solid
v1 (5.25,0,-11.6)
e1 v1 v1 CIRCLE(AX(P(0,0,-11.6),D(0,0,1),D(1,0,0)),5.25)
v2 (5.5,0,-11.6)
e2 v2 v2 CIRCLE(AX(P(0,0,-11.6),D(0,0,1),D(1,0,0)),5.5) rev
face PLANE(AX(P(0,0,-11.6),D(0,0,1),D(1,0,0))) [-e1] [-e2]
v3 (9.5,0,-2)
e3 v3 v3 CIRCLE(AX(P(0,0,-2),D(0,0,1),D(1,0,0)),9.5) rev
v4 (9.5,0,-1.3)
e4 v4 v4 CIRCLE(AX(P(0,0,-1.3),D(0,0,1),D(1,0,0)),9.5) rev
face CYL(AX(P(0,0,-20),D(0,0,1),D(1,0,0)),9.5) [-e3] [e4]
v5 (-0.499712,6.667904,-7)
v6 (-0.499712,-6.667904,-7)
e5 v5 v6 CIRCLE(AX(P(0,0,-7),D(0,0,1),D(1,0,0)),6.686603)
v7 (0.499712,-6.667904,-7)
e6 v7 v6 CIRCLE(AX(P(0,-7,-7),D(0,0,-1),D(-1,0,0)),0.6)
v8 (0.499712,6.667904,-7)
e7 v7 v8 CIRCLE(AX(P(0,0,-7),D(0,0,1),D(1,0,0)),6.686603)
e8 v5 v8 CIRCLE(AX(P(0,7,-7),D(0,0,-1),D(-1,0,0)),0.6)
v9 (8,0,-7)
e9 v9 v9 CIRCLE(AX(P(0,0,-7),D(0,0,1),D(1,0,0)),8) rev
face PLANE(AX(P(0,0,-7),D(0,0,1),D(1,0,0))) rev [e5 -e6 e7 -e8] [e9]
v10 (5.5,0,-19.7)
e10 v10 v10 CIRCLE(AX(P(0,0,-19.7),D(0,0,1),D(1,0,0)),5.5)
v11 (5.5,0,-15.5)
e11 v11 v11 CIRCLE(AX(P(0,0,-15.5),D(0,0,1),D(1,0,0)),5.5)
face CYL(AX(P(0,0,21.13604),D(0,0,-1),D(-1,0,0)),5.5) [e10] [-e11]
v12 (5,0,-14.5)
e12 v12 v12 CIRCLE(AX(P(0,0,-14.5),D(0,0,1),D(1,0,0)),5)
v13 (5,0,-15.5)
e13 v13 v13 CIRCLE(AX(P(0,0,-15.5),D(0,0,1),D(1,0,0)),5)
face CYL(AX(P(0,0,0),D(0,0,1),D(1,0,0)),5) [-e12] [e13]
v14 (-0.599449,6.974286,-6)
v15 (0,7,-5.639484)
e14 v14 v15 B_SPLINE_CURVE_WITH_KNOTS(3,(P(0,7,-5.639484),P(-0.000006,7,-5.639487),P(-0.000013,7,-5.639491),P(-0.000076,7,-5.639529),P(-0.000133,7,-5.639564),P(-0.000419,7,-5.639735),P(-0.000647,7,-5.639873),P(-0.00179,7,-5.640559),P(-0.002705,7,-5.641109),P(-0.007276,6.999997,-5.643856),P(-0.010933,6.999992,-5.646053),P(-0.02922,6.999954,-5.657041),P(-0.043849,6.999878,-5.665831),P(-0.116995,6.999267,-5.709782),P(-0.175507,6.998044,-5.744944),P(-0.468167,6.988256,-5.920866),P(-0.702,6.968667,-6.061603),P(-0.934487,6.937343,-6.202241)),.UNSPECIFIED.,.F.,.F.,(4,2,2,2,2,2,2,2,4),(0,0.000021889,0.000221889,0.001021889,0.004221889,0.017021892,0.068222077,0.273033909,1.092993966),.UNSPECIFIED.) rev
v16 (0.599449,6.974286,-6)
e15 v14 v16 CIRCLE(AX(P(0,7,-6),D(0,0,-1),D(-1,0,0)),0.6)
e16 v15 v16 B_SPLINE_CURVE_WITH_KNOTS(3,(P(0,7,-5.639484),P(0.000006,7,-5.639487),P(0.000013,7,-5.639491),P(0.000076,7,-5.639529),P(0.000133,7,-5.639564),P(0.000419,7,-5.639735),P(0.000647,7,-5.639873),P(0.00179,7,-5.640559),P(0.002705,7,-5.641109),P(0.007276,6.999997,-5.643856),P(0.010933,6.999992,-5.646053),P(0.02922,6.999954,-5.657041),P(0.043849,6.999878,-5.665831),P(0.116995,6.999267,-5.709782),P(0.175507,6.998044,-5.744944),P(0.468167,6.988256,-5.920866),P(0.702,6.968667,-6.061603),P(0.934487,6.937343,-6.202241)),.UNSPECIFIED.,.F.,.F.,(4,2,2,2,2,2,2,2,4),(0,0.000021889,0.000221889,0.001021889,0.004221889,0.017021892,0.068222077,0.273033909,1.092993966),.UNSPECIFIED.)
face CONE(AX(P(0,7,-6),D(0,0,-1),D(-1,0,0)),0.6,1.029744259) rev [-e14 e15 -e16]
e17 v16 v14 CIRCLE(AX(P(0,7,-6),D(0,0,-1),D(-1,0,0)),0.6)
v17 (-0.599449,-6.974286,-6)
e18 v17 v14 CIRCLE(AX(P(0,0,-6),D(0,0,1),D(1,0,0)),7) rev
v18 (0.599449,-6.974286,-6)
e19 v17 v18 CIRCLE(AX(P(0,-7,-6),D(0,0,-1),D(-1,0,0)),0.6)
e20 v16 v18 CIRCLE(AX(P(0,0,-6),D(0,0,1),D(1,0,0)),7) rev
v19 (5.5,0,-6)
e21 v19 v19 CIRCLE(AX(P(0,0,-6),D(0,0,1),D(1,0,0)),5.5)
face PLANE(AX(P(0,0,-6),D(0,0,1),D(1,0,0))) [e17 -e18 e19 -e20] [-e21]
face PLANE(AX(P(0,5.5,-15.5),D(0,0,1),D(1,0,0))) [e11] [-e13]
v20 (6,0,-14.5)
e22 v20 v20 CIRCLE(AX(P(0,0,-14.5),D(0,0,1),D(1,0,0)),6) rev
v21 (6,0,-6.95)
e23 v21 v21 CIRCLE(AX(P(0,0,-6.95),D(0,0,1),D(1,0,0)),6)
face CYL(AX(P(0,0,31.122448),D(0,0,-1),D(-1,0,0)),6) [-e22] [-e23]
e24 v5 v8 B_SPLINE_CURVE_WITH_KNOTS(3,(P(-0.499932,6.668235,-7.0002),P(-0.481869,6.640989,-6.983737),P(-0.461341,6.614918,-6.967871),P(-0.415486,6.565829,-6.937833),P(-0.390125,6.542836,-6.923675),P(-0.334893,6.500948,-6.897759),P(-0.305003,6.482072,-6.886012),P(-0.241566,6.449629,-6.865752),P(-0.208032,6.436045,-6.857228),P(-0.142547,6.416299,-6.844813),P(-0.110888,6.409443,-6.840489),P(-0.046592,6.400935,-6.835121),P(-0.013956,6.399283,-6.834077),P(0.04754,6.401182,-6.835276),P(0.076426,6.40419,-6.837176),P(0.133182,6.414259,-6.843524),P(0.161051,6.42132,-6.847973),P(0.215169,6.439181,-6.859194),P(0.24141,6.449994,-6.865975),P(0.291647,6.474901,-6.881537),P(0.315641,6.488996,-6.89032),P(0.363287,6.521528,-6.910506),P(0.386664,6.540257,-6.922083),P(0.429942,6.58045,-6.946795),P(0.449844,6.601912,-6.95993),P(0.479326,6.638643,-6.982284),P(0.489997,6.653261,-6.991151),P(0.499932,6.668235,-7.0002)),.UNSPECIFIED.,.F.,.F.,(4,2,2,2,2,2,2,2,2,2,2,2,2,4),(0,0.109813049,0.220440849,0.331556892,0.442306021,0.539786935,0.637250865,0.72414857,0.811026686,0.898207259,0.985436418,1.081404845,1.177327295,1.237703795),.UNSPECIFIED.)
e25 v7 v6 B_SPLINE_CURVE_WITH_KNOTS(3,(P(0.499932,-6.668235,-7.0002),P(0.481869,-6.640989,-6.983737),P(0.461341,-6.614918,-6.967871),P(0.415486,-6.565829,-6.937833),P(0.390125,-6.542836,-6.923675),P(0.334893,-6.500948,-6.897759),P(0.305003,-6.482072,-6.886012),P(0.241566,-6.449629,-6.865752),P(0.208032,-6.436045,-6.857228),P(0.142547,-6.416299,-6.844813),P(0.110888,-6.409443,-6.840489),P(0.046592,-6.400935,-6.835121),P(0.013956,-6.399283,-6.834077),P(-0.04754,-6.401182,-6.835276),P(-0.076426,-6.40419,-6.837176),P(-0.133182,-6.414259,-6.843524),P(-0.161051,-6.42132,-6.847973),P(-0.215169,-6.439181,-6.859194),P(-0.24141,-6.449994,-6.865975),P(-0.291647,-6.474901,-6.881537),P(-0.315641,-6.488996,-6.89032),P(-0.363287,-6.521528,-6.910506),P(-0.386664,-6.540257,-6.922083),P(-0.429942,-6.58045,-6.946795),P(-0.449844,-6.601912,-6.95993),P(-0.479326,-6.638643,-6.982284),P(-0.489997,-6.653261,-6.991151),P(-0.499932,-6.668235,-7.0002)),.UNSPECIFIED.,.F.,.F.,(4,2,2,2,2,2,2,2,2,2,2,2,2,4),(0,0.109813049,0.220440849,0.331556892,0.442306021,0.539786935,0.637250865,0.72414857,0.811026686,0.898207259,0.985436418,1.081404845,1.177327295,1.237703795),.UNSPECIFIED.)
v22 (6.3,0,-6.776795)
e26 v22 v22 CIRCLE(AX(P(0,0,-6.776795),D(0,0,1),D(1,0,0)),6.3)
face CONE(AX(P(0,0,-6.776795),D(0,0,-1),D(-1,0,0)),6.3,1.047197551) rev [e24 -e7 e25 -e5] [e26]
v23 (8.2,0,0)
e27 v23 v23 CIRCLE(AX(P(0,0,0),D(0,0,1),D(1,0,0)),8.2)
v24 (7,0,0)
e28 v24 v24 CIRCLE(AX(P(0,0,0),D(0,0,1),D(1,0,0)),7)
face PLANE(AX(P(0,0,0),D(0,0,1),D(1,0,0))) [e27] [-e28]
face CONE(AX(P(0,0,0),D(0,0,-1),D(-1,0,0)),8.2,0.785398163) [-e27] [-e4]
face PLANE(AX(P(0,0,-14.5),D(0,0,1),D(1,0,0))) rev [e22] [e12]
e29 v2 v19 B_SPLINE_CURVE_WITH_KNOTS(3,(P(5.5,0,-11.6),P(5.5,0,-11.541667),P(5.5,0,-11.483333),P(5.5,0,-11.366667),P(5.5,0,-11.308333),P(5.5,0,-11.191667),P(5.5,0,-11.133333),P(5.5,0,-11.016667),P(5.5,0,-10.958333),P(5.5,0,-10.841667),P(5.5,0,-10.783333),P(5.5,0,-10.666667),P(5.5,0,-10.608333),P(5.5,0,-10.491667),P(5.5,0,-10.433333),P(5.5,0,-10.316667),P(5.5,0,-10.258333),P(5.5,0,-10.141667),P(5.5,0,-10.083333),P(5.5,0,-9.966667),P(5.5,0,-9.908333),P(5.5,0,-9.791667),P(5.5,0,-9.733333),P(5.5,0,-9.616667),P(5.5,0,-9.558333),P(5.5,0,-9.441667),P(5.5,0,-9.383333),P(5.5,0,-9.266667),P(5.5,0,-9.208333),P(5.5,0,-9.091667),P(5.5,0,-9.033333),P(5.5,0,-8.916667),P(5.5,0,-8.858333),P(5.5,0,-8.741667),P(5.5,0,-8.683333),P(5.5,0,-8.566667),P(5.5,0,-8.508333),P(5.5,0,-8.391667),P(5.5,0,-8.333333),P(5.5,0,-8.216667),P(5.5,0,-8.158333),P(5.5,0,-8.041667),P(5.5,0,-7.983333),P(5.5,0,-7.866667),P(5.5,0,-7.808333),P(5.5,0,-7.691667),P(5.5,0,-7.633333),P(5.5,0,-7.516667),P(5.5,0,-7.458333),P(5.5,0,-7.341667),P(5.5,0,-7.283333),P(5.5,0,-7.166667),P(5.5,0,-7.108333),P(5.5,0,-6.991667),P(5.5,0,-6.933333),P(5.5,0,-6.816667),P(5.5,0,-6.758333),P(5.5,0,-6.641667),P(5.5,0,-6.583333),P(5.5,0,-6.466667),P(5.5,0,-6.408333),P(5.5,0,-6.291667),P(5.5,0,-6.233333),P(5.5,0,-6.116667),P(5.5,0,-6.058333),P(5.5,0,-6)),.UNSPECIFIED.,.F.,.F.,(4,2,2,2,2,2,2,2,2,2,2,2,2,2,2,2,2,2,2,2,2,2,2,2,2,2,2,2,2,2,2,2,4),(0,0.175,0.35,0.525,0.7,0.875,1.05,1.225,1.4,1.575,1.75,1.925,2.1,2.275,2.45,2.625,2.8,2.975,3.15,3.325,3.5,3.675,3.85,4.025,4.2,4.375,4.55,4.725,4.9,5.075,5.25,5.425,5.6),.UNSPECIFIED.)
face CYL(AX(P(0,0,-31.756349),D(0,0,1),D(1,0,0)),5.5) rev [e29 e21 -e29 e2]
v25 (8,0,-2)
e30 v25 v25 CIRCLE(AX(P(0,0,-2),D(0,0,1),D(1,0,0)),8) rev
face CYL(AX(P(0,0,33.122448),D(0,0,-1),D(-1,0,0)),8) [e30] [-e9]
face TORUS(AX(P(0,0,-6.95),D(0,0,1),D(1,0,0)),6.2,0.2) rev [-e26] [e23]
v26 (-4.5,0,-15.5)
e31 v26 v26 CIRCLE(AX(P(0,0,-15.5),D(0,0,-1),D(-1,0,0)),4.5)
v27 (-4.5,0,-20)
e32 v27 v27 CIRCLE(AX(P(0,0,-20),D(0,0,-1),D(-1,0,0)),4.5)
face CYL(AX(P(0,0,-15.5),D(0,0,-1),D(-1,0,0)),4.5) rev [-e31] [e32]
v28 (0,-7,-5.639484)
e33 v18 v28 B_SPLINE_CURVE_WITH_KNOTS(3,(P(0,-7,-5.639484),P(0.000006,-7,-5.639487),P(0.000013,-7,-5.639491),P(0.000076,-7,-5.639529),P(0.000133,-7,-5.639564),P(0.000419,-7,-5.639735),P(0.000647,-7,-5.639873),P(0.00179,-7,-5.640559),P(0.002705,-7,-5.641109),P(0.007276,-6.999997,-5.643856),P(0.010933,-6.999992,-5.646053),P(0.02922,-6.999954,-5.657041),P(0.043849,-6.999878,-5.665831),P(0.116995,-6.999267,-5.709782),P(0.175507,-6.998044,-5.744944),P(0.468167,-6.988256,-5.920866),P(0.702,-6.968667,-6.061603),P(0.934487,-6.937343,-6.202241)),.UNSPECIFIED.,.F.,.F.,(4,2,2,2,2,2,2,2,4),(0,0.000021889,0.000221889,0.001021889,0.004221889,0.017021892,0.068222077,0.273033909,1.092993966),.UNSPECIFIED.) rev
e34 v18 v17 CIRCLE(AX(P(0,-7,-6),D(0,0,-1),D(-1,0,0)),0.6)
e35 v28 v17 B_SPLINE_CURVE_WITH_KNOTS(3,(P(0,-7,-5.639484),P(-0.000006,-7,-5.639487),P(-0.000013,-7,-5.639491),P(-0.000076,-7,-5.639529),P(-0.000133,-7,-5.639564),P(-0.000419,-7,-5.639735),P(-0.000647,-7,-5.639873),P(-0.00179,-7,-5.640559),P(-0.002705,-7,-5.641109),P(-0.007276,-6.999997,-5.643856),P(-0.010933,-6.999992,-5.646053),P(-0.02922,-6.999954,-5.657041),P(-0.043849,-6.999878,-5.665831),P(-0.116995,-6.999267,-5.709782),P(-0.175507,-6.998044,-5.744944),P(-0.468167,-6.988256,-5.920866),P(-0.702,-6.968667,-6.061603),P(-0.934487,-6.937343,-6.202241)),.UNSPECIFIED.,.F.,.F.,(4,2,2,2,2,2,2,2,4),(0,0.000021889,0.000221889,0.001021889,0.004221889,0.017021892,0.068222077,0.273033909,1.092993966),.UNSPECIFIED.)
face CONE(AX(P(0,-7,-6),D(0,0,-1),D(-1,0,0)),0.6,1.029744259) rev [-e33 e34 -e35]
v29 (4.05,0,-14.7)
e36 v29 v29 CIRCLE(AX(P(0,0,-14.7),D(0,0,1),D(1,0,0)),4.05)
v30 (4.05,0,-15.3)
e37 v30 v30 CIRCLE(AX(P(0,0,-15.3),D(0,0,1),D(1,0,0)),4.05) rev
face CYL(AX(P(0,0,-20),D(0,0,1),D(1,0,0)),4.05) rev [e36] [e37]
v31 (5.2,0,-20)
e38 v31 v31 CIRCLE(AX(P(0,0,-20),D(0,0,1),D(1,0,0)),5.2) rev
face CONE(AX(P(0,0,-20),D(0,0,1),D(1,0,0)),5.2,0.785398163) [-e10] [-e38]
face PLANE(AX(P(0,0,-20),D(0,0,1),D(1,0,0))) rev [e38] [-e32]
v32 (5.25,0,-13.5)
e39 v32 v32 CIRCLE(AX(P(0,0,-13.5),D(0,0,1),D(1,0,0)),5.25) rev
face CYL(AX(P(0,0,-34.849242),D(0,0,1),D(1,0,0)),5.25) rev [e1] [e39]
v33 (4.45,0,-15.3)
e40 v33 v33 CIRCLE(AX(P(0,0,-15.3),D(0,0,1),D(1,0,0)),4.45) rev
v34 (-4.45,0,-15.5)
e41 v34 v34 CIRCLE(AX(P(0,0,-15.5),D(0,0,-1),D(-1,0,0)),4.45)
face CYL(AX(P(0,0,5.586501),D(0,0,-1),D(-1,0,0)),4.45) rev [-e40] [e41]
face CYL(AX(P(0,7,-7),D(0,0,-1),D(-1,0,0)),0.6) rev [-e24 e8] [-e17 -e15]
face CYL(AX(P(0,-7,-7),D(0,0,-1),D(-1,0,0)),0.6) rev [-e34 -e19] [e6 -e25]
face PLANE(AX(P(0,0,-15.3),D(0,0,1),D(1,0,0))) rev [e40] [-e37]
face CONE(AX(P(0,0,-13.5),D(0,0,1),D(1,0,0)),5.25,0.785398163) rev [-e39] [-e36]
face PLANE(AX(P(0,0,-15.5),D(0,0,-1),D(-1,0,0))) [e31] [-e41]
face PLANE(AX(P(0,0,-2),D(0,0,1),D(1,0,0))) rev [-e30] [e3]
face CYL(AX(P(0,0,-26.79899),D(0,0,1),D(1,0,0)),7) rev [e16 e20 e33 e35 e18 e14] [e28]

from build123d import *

# Parameters (mm, degrees)
SKETCH1_R                           = 9.5
BOSS_EXTRUDE1_DEPTH                 = 20
SKETCH2_OUTSIDE_W                   = 27.7
SKETCH2_OUTSIDE_H                   = 27.7
SKETCH2_OUTSIDE_R                   = 8
CUT_EXTRUDE1_DEPTH                  = 18
SKETCH3_OUTSIDE_W                   = 27.7
SKETCH3_OUTSIDE_H                   = 27.7
SKETCH3_OUTSIDE_R                   = 6
CUT_EXTRUDE2_DEPTH                  = 13
SKETCH4_OUTSIDE_W                   = 27.7
SKETCH4_OUTSIDE_H                   = 27.7
SKETCH4_OUTSIDE_R                   = 5.5
CUT_EXTRUDE3_DEPTH                  = 5.5
SKETCH5_W                           = 1
SKETCH5_H                           = 0.5
CHAMFER1_SIZE                       = 0.3
CHAMFER2_SIZE                       = 1.3
SKETCH7_R                           = 4.05
CUT_EXTRUDE4_DEPTH                  = 25.093567606
SKETCH8_R                           = 4.5
CUT_EXTRUDE5_DEPTH                  = 4.5
SKETCH9_R                           = 4.45
CUT_EXTRUDE9_DEPTH                  = 0.2
SKETCH10_R                          = 7
CUT_EXTRUDE11_DEPTH                 = 6
CUT_EXTRUDE12_START                 = -5.6
SKETCH11_R                          = 5.5
CUT_EXTRUDE12_DEPTH                 = 5.6
SKETCH12_R                          = 5.25
CUT_EXTRUDE13_DEPTH                 = 1.9
CHAMFER3_SIZE                       = 1.2
F_1_2_1_2_DIAMETER_HOLE1_AT_2_COUNT = 2
F_1_2_1_2_DIAMETER_HOLE1_AT_2_PITCH = 14


with BuildPart() as part:
    # Sketch1 → Boss-Extrude1 (new body)
    with BuildSketch(Plane.XY):
        Circle(SKETCH1_R)
    extrude(amount=-BOSS_EXTRUDE1_DEPTH)

    # Sketch2 outside → Cut-Extrude1 (cut)
    with BuildSketch(Plane(origin=(0, 0, -20), x_dir=(-1, 0, 0), z_dir=(0, 0, -1))):
        Rectangle(SKETCH2_OUTSIDE_W, SKETCH2_OUTSIDE_H)
        Circle(SKETCH2_OUTSIDE_R, mode=Mode.SUBTRACT)
    extrude(amount=-CUT_EXTRUDE1_DEPTH, mode=Mode.SUBTRACT)

    # Sketch3 outside → Cut-Extrude2 (cut)
    with BuildSketch(Plane(origin=(0, 0, -20), x_dir=(-1, 0, 0), z_dir=(0, 0, -1))):
        Rectangle(SKETCH3_OUTSIDE_W, SKETCH3_OUTSIDE_H)
        Circle(SKETCH3_OUTSIDE_R, mode=Mode.SUBTRACT)
    extrude(amount=-CUT_EXTRUDE2_DEPTH, mode=Mode.SUBTRACT)

    # Sketch4 outside → Cut-Extrude3 (cut)
    with BuildSketch(Plane(origin=(0, 0, -20), x_dir=(-1, 0, 0), z_dir=(0, 0, -1))):
        Rectangle(SKETCH4_OUTSIDE_W, SKETCH4_OUTSIDE_H)
        Circle(SKETCH4_OUTSIDE_R, mode=Mode.SUBTRACT)
    extrude(amount=-CUT_EXTRUDE3_DEPTH, mode=Mode.SUBTRACT)

    # Sketch5 → Cut-Revolve1 (revolve, cut)
    with BuildSketch(Plane(origin=(0, 0, 0), x_dir=(0, 0, -1), z_dir=(1, 0, 0)), mode=Mode.PRIVATE) as cut_revolve1_sk:
        with Locations((15, 5.25)):
            Rectangle(SKETCH5_W, SKETCH5_H)
    revolve(cut_revolve1_sk.sketch.rotate(Axis((0, 0, 0), (0, 0, -1)), 90), axis=Axis((0, 0, 0), (0, 0, -1)), mode=Mode.SUBTRACT)

    # Chamfer1
    chamfer1_edges = [part.edges().sort_by_distance(p)[0] for p in [
        (5.5, 0, -20),
    ]]
    chamfer(chamfer1_edges, length=CHAMFER1_SIZE)

    # Chamfer2
    chamfer2_edges = [part.edges().sort_by_distance(p)[0] for p in [
        (-9.5, 0, 0),
    ]]
    chamfer(chamfer2_edges, length=CHAMFER2_SIZE)

    # Sketch6 → Cut-Revolve2 (revolve, cut)
    with BuildSketch(Plane(origin=(0, 0, 0), x_dir=(0, 0, -1), z_dir=(1, 0, 0)), mode=Mode.PRIVATE) as cut_revolve2_sk:
        with BuildLine():
            Line((7.2, -7.033012702), (6.776794919, -6.3))
            ThreePointArc((6.776794919, -6.3), (6.776794919, -6.1), (6.95, -6))
            Line((6.95, -6), (7.2, -6))
            Line((7.2, -6), (7.2, -7.033012702))
        make_face()
    revolve(cut_revolve2_sk.sketch.rotate(Axis((0, 0, 0), (0, 0, -1)), 270), axis=Axis((0, 0, 0), (0, 0, -1)), mode=Mode.SUBTRACT)

    # Sketch7 → Cut-Extrude4 (cut, through all)
    with BuildSketch(Plane.XY):
        Circle(SKETCH7_R)
    extrude(amount=-CUT_EXTRUDE4_DEPTH, mode=Mode.SUBTRACT)

    # Sketch8 → Cut-Extrude5 (cut)
    with BuildSketch(Plane(origin=(0, 0, -20), x_dir=(-1, 0, 0), z_dir=(0, 0, -1))):
        Circle(SKETCH8_R)
    extrude(amount=-CUT_EXTRUDE5_DEPTH, mode=Mode.SUBTRACT)

    # Sketch9 → Cut-Extrude9 (cut)
    with BuildSketch(Plane(origin=(0, 0, -15.5), x_dir=(-1, 0, 0), z_dir=(0, 0, -1))):
        Circle(SKETCH9_R)
    extrude(amount=-CUT_EXTRUDE9_DEPTH, mode=Mode.SUBTRACT)

    # Sketch10 → Cut-Extrude11 (cut)
    with BuildSketch(Plane.XY):
        Circle(SKETCH10_R)
    extrude(amount=-CUT_EXTRUDE11_DEPTH, mode=Mode.SUBTRACT)

    # Sketch11 → Cut-Extrude12 (cut)
    with BuildSketch(Plane.XY.offset(-6).offset(CUT_EXTRUDE12_START)):
        Circle(SKETCH11_R)
    extrude(amount=CUT_EXTRUDE12_DEPTH, mode=Mode.SUBTRACT)

    # Sketch12 → Cut-Extrude13 (cut)
    with BuildSketch(Plane.XY.offset(-11.6)):
        Circle(SKETCH12_R)
    extrude(amount=-CUT_EXTRUDE13_DEPTH, mode=Mode.SUBTRACT)

    # Chamfer3
    chamfer3_edges = [part.edges().sort_by_distance(p)[0] for p in [
        (-4.05, 0, -13.5),
    ]]
    chamfer(chamfer3_edges, length=CHAMFER3_SIZE - 0.0001)  # a hair under: the kernel refuses the full size

    # Sketch15 → Ø1.2 (1.2) Diameter Hole1 (revolve, cut)
    with BuildSketch(Plane(origin=(0, -7, -7), x_dir=(0, 1, 0), z_dir=(1, 0, 0))):
        Polygon((0, 0), (0, 1.360516371), (0.6, 1), (0.6, 0), align=None)
    f_1_2_1_2_diameter_hole1 = revolve(axis=Axis((0, -7, -13.35), (0, 0, 1)), mode=Mode.SUBTRACT)

    # Ø1.2 (1.2) Diameter Hole1 at 2: Ø1.2 (1.2) Diameter Hole1 ×2
    with Locations(*[(0, i * F_1_2_1_2_DIAMETER_HOLE1_AT_2_PITCH, 0) for i in range(1, F_1_2_1_2_DIAMETER_HOLE1_AT_2_COUNT)]):
        add(f_1_2_1_2_diameter_hole1, mode=Mode.SUBTRACT)


solid = part.part
